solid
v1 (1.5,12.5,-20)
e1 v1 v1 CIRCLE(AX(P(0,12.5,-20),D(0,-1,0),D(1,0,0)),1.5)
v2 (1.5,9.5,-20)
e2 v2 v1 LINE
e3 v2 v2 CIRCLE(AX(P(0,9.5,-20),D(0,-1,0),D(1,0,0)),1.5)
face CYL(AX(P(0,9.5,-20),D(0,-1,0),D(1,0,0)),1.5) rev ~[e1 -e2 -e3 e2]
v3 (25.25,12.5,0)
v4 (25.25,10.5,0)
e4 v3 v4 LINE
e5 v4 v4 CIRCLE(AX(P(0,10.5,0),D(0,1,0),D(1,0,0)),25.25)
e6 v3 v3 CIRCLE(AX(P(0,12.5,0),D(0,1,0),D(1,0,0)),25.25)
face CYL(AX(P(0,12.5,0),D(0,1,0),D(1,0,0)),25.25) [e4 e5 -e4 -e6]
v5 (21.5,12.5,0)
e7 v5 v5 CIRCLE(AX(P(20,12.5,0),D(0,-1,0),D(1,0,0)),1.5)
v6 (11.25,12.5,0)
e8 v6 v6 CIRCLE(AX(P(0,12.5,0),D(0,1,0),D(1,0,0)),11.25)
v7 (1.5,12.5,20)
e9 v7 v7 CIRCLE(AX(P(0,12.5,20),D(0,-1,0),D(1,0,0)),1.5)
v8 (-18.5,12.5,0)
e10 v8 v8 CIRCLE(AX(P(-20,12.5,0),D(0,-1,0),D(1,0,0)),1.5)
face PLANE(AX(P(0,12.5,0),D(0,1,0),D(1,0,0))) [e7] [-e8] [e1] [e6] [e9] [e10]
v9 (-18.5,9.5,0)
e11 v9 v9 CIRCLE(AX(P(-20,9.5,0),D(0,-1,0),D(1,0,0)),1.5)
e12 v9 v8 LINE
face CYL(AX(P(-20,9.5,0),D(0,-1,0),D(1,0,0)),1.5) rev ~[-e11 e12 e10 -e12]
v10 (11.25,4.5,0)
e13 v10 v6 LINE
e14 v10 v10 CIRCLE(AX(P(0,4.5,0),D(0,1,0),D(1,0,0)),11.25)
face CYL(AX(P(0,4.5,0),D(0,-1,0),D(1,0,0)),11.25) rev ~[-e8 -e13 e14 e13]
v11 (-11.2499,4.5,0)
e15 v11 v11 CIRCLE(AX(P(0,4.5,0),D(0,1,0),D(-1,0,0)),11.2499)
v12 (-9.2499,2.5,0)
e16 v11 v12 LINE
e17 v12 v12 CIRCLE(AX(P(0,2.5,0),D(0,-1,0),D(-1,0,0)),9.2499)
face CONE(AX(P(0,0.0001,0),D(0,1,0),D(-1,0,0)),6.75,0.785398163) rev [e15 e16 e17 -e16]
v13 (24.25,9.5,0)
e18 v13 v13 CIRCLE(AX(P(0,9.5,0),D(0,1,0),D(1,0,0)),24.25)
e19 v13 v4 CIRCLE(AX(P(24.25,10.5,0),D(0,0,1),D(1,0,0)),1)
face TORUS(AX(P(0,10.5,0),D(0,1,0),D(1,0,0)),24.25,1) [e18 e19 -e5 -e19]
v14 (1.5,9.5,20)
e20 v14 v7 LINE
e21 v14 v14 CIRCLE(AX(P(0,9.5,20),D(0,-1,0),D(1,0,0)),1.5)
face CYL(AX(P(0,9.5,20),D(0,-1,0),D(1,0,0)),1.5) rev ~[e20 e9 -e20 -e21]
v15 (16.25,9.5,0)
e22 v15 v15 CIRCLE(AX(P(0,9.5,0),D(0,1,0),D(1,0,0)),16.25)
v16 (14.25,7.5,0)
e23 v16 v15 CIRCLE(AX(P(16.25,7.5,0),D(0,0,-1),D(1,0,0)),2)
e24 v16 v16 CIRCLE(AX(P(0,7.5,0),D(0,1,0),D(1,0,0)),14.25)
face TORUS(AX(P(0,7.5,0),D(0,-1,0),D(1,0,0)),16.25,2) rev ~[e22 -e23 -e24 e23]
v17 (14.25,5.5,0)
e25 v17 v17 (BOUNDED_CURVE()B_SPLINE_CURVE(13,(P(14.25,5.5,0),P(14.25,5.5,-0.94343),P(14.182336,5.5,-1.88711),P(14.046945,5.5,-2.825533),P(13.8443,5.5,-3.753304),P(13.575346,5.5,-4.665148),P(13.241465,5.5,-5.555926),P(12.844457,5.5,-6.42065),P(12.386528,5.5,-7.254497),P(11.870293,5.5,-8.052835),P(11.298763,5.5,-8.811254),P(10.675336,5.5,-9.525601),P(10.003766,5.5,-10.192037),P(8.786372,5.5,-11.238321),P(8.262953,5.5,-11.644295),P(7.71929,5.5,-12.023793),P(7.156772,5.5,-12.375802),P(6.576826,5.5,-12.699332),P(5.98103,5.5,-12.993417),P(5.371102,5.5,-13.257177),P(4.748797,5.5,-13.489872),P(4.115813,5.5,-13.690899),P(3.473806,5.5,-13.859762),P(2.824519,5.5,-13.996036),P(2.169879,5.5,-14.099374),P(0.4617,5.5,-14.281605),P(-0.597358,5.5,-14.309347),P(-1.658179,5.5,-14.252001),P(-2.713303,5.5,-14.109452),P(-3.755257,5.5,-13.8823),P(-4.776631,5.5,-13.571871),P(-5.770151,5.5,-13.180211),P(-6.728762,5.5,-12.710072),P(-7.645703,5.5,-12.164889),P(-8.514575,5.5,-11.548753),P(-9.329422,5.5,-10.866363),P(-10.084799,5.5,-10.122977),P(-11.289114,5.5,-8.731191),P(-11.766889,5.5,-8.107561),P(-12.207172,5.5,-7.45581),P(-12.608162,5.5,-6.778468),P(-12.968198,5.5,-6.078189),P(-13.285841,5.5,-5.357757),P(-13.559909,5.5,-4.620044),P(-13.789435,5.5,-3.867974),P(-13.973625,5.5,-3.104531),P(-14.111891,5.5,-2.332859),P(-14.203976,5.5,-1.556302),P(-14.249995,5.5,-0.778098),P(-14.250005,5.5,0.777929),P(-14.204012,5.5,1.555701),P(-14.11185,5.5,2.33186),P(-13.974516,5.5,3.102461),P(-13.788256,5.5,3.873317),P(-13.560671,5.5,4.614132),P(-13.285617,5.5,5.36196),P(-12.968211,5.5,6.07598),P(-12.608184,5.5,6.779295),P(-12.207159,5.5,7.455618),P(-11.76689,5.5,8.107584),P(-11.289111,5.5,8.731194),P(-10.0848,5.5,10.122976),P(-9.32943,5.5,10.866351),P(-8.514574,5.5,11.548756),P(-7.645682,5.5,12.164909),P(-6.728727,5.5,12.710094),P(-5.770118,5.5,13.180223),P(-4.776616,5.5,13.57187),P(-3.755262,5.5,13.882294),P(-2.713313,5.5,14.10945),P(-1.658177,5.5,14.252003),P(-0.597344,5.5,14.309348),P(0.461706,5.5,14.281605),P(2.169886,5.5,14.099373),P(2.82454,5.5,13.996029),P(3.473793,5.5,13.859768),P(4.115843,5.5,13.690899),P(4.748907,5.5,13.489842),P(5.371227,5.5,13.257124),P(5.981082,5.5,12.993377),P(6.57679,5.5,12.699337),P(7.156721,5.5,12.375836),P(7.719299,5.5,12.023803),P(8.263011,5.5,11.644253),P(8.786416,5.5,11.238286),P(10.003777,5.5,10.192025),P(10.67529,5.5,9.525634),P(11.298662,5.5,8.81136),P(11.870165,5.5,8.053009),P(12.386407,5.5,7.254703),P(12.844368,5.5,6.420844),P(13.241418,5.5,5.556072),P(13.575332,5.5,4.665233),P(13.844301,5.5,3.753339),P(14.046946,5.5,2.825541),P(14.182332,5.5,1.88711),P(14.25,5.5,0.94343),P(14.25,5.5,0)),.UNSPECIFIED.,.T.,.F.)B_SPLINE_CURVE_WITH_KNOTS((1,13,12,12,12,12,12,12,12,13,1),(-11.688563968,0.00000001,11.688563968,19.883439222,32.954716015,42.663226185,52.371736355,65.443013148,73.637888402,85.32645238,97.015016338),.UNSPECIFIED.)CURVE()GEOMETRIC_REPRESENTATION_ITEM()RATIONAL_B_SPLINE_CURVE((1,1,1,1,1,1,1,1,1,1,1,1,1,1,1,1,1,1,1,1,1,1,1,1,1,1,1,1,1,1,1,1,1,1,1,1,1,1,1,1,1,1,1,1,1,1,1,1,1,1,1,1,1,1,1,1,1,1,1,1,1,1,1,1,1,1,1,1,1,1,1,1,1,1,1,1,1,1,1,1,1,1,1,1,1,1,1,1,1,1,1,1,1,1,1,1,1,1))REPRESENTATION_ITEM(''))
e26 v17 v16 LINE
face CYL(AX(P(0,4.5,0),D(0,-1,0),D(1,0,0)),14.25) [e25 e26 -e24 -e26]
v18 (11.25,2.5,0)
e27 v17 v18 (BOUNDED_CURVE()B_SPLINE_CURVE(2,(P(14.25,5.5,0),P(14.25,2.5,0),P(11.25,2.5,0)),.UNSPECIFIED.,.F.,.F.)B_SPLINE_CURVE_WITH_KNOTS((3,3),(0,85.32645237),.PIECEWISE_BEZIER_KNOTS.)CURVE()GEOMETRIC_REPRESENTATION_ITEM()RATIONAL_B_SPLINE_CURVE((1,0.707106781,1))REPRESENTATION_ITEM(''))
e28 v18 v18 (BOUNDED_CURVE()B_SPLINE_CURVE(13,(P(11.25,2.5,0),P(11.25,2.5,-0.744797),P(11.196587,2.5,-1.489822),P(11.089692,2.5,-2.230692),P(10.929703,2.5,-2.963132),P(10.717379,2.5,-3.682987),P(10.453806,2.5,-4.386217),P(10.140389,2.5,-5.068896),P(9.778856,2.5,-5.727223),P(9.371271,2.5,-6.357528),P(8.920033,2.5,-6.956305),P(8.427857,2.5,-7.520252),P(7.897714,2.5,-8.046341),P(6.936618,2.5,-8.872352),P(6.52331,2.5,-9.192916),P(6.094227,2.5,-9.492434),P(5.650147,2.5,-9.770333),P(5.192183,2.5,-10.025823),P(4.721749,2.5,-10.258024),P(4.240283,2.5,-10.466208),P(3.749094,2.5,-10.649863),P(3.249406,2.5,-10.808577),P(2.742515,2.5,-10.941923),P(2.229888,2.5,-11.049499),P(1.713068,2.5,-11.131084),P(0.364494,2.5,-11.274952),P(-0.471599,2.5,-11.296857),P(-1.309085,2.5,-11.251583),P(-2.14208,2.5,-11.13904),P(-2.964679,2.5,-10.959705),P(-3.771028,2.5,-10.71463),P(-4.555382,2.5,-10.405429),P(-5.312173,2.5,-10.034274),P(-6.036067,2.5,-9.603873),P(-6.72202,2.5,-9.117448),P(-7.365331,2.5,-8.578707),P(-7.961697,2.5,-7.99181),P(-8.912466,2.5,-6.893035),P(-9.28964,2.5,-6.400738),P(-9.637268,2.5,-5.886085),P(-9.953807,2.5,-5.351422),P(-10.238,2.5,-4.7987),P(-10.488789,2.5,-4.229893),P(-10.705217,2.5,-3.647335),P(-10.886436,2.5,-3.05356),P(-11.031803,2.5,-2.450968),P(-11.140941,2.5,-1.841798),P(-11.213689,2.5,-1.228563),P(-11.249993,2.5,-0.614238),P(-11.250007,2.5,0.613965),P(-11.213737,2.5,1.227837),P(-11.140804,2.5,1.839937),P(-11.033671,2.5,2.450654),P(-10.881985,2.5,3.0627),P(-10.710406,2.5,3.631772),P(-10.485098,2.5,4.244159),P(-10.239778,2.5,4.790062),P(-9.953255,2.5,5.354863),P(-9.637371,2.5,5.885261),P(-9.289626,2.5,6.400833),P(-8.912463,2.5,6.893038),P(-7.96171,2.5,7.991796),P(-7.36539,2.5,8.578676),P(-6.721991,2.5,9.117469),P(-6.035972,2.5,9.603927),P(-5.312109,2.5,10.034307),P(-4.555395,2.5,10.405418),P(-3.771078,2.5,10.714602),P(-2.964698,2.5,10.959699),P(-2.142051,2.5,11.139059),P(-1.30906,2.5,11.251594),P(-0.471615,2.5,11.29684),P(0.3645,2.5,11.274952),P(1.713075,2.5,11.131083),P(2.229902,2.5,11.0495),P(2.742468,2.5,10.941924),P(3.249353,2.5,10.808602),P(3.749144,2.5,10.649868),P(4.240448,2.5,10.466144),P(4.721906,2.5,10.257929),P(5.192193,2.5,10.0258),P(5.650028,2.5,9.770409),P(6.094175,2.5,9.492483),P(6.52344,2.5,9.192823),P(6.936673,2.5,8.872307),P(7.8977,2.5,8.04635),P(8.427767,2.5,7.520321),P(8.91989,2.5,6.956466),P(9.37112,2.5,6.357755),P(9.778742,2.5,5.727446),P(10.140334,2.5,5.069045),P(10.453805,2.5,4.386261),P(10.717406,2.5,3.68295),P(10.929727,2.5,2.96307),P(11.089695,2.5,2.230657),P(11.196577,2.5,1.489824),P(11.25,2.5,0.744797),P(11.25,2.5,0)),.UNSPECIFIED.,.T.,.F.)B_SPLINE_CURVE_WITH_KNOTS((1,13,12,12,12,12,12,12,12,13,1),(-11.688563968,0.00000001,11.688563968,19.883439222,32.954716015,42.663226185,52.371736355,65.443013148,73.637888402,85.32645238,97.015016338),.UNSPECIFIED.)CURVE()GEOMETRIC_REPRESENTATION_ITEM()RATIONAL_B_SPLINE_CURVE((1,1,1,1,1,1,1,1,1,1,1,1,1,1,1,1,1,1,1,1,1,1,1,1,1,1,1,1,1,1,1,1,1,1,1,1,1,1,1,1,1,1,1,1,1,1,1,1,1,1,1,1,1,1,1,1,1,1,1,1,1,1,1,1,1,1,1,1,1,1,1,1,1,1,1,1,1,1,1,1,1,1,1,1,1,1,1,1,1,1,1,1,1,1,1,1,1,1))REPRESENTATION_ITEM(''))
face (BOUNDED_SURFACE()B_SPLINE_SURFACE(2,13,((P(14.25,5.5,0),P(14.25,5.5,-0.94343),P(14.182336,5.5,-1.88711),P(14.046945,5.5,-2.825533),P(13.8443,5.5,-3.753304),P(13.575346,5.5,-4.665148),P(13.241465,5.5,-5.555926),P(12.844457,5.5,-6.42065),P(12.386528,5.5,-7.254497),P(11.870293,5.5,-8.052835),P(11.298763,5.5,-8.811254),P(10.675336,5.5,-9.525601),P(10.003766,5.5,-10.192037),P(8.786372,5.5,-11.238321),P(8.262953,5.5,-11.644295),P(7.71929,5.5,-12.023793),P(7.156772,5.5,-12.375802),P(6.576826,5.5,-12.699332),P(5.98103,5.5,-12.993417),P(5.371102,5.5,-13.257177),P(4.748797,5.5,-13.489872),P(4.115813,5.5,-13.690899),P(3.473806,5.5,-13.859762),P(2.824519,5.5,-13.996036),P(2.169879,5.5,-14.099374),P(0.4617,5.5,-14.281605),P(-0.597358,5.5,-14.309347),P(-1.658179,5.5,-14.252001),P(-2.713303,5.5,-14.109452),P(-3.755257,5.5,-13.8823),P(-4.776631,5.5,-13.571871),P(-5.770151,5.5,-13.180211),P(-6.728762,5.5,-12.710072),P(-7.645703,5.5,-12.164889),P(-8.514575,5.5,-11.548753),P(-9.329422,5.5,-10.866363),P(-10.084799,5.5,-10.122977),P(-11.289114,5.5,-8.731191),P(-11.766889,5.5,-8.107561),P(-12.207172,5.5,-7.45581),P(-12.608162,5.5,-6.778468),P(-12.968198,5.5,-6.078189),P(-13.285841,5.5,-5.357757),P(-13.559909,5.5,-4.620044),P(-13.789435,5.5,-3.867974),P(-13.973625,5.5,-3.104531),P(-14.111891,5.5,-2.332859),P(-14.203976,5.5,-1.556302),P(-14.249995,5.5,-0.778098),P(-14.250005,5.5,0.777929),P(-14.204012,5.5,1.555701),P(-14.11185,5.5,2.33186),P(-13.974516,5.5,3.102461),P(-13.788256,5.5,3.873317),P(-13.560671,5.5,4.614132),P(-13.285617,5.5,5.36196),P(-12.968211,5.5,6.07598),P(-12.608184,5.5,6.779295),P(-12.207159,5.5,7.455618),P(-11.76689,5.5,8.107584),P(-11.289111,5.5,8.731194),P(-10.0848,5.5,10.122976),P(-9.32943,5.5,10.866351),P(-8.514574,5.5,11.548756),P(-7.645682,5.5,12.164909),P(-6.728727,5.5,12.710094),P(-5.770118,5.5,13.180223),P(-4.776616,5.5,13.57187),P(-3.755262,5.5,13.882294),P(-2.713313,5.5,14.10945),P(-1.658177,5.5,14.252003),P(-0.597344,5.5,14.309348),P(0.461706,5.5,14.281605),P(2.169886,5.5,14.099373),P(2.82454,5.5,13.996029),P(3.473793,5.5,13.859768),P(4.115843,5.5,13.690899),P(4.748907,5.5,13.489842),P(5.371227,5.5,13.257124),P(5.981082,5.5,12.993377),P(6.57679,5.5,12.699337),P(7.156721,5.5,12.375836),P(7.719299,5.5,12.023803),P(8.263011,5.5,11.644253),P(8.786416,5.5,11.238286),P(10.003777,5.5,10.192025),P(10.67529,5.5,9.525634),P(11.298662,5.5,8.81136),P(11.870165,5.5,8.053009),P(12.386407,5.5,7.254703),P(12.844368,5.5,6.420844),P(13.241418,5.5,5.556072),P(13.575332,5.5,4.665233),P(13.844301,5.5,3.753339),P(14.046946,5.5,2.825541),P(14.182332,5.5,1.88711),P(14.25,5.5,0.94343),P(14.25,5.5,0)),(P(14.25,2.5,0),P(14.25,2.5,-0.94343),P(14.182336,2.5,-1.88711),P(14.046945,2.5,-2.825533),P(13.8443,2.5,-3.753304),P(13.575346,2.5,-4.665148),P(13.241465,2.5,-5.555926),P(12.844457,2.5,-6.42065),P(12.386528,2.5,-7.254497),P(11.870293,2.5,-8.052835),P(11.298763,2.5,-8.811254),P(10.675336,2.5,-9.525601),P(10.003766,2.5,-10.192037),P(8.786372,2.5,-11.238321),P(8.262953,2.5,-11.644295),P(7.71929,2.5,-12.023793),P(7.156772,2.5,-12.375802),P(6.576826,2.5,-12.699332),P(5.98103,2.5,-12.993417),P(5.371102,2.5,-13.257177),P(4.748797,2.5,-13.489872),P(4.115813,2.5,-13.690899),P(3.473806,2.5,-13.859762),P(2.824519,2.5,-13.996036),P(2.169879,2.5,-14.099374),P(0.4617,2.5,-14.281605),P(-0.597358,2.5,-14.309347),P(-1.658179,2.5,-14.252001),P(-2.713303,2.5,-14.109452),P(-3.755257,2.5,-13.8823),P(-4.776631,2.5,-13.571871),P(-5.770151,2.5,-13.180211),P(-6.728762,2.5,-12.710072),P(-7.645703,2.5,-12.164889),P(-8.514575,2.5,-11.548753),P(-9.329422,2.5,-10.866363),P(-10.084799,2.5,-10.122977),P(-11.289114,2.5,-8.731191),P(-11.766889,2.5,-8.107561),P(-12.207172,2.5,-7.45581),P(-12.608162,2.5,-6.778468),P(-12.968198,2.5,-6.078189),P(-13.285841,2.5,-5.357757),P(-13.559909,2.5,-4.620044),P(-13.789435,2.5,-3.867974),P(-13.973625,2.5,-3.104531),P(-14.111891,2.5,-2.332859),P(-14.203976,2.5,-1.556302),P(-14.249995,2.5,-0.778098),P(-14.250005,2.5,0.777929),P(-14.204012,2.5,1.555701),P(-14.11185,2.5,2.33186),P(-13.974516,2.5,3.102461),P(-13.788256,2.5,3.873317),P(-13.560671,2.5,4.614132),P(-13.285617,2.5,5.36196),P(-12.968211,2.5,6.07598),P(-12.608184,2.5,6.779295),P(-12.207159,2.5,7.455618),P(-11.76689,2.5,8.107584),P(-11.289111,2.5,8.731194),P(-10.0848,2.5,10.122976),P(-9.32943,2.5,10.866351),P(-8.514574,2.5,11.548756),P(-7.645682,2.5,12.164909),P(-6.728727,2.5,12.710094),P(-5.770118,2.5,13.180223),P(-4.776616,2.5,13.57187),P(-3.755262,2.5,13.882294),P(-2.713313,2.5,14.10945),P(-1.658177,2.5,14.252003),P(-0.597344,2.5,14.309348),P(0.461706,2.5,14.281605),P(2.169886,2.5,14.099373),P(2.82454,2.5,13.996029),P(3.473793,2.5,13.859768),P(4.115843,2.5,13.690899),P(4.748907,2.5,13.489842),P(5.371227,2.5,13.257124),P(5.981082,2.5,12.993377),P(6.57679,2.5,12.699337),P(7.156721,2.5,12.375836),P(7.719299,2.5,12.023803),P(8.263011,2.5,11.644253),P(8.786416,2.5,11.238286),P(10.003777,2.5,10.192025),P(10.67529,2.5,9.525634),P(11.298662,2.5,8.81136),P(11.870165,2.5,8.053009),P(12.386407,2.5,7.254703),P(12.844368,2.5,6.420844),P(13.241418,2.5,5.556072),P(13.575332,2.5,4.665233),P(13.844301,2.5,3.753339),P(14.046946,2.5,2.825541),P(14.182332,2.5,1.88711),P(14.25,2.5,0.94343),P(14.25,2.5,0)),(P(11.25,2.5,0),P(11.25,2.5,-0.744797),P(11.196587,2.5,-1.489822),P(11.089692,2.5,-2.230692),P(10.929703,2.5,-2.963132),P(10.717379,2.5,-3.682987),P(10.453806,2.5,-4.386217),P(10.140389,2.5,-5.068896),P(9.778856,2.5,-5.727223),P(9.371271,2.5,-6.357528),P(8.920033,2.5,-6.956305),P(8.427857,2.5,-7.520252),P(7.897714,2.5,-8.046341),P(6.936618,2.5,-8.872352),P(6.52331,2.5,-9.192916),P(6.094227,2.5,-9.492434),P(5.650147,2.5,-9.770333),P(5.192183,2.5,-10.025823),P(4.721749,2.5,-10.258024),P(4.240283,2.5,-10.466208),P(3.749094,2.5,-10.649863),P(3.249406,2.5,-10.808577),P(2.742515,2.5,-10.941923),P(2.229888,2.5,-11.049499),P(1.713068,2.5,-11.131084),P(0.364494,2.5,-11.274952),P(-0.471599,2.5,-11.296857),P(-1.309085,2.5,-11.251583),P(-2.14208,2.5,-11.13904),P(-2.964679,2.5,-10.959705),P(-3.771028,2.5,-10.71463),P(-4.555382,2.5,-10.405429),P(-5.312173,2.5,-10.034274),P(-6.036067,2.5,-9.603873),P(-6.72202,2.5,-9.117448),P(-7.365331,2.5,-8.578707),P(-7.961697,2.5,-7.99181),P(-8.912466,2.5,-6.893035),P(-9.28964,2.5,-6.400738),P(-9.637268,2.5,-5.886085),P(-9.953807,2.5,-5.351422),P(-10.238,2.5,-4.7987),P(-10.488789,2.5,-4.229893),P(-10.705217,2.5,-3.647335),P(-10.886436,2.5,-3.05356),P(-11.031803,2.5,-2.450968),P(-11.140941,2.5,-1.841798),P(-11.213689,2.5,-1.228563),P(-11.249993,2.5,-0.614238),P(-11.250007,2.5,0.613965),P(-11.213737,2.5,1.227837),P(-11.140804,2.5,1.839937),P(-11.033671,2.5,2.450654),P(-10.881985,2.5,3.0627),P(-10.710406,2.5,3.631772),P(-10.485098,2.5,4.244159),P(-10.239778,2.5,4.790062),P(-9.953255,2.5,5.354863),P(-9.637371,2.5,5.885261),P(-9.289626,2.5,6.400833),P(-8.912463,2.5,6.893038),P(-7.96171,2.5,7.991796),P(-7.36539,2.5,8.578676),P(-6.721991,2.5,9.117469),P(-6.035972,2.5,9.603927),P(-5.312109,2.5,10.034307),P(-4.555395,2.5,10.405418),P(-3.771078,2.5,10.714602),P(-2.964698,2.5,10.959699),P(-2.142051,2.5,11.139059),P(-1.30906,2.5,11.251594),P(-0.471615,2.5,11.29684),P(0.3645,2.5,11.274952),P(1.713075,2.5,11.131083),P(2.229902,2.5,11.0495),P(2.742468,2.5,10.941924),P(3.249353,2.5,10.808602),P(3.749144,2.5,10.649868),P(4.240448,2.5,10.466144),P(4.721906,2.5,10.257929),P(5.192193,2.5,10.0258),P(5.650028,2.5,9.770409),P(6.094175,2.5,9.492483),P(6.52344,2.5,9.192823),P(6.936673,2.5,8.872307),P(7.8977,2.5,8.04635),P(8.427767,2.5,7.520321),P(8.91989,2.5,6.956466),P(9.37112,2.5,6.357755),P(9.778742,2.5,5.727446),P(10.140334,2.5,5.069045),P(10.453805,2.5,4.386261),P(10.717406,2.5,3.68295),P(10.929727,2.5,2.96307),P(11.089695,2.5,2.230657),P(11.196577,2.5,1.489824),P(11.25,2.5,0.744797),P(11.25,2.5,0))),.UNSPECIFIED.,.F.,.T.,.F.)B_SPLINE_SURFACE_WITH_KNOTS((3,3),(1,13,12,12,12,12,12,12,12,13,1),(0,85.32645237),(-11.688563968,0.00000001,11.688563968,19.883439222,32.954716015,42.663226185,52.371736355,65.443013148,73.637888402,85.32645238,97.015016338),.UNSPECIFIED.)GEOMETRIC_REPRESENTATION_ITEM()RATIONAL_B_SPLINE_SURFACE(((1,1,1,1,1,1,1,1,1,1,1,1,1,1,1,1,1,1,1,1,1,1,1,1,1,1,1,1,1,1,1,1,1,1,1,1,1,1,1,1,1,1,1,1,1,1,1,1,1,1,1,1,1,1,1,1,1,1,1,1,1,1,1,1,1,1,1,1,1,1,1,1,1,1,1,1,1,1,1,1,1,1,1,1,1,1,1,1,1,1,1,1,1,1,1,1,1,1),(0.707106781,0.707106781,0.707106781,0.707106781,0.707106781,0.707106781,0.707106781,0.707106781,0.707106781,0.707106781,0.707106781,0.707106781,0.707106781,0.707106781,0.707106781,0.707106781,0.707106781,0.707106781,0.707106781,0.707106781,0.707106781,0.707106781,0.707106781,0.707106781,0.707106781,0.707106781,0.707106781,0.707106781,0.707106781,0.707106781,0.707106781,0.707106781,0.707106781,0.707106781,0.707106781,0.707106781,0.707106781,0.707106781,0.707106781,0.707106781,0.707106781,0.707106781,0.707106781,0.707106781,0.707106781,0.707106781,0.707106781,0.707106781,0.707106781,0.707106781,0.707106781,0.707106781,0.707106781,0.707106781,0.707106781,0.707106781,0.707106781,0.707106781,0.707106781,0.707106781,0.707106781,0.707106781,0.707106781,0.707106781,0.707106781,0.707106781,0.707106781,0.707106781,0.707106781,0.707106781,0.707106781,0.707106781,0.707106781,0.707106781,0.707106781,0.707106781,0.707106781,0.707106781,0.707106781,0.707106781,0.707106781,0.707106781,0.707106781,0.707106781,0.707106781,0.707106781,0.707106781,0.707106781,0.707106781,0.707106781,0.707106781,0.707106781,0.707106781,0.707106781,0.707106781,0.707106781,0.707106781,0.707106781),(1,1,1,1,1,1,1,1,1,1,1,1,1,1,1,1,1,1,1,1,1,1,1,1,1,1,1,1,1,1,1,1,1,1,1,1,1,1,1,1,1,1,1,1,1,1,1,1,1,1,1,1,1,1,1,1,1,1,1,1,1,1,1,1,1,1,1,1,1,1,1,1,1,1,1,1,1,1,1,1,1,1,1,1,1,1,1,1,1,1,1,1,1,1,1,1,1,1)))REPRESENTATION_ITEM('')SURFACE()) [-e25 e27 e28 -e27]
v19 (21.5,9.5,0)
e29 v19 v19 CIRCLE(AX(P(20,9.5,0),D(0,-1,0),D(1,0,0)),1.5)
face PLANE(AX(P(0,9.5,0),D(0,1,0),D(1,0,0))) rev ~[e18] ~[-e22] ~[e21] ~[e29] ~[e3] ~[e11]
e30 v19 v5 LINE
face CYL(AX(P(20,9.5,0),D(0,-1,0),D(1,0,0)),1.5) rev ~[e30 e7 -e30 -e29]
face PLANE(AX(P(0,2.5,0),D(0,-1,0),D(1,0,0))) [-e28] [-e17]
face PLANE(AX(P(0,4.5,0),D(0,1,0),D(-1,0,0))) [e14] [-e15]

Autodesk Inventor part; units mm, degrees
ref_plane "YZ Plane" through (0, 0, 0) normal (1, 0, 0) x (0, 1, 0)
ref_plane "XZ Plane" through (0, 0, 0) normal (0, 1, 0) x (-1, 0, 0)
ref_plane "XY Plane" through (0, 0, 0) normal (0, 0, 1) x (1, 0, 0)
sketch "Sketch1" plane through (0, 0, 0) normal (0, 1, 0) x (-1, 0, 0)
  circle A0 centre (0, 0) radius 11.25
  circle A1 centre (0, 0) radius 14.25
  circle A2 centre (0, 0) radius 30
  circle A3 centre (0, 0) radius 6.75
  dimension "d0" = 22.5
  dimension "d1" = 28.5
  dimension "d2" = 60
  dimension "d3" = 13.5
extrude "Extrusion1" add sketch "Sketch1" along normal blind 4.5 contours A0 | A1
sketch "Sketch2" plane through (0, 4.5, 0) normal (0, 1, 0) x (1, 0, 0)
  circle A0 centre (0, 0) radius 14.25 projected
  circle A1 centre (0, 0) radius 11.25
  dimension "d6" = 22.5
extrude "Extrusion2" add sketch "Sketch2" along normal blind 8
sketch "Sketch3" plane through (0, 12.5, 0) normal (0, 1, 0) x (1, 0, 0)
  circle A0 centre (0, 0) radius 14.25 projected
  circle A1 centre (0, 0) radius 25.25
  dimension "d9" = 50.5
extrude "Extrusion3" add sketch "Sketch3" against normal blind 3
chamfer "Chamfer2" distance 4.5 angle 45 1 edges at (6.75, 4.5, 0)
fillet "Fillet1" radius 5 1 edges at (14.25, 0, 0)
fillet "Fillet2" radius 2 1 edges at (-14.25, 9.5, 0)
fillet "Fillet3" radius 1 1 edges at (-25.25, 9.5, 0)
sketch "Sketch5" plane through (0, 9.5, 0) normal (0, -1, 0) x (1, 0, 0)
  circle A0 centre (0, 0) radius 16.25 projected
  circle A1 centre (-20, 0) radius 1.5
  circle A2 centre (-20, 0) radius 3.75
  circle A3 centre (20, 0) radius 1.5
  circle A4 centre (0, -20) radius 1.5
  circle A5 centre (0, 20) radius 1.5
  dimension "d21" = 3
  dimension "d22" = 20
  dimension "d23" = 3
  dimension "d24" = 20
  dimension "d25" = 3
  dimension "d26" = 20
  dimension "d27" = 3
  dimension "d28" = 20
extrude "Extrusion4" cut sketch "Sketch5" against normal blind 11 contours A1 | A3 | A4 | A5
sketch "Sketch6" plane through (0, 0, 0) normal (0, -1, 0) x (1, 0, 0)
  circle A0 centre (0, 0) radius 9.25 projected
  circle A1 centre (0, 0) radius 18.9593
extrude "Extrusion5" cut sketch "Sketch6" against normal blind 2.5 contours A0 | A1
sketch "Sketch7" plane through (0, 2.5, 0) normal (0, -1, 0) x (1, 0, 0)
  circle A0 centre (0, 0) radius 13.5801 projected
  circle A1 centre (0, 0) radius 9.25 projected
fillet "Fillet4" radius 3 2 edges at (0, 2.5, 13.5801) (0, 2.5, -13.5801)
properties part number "supportoCuscinettoAlto"
